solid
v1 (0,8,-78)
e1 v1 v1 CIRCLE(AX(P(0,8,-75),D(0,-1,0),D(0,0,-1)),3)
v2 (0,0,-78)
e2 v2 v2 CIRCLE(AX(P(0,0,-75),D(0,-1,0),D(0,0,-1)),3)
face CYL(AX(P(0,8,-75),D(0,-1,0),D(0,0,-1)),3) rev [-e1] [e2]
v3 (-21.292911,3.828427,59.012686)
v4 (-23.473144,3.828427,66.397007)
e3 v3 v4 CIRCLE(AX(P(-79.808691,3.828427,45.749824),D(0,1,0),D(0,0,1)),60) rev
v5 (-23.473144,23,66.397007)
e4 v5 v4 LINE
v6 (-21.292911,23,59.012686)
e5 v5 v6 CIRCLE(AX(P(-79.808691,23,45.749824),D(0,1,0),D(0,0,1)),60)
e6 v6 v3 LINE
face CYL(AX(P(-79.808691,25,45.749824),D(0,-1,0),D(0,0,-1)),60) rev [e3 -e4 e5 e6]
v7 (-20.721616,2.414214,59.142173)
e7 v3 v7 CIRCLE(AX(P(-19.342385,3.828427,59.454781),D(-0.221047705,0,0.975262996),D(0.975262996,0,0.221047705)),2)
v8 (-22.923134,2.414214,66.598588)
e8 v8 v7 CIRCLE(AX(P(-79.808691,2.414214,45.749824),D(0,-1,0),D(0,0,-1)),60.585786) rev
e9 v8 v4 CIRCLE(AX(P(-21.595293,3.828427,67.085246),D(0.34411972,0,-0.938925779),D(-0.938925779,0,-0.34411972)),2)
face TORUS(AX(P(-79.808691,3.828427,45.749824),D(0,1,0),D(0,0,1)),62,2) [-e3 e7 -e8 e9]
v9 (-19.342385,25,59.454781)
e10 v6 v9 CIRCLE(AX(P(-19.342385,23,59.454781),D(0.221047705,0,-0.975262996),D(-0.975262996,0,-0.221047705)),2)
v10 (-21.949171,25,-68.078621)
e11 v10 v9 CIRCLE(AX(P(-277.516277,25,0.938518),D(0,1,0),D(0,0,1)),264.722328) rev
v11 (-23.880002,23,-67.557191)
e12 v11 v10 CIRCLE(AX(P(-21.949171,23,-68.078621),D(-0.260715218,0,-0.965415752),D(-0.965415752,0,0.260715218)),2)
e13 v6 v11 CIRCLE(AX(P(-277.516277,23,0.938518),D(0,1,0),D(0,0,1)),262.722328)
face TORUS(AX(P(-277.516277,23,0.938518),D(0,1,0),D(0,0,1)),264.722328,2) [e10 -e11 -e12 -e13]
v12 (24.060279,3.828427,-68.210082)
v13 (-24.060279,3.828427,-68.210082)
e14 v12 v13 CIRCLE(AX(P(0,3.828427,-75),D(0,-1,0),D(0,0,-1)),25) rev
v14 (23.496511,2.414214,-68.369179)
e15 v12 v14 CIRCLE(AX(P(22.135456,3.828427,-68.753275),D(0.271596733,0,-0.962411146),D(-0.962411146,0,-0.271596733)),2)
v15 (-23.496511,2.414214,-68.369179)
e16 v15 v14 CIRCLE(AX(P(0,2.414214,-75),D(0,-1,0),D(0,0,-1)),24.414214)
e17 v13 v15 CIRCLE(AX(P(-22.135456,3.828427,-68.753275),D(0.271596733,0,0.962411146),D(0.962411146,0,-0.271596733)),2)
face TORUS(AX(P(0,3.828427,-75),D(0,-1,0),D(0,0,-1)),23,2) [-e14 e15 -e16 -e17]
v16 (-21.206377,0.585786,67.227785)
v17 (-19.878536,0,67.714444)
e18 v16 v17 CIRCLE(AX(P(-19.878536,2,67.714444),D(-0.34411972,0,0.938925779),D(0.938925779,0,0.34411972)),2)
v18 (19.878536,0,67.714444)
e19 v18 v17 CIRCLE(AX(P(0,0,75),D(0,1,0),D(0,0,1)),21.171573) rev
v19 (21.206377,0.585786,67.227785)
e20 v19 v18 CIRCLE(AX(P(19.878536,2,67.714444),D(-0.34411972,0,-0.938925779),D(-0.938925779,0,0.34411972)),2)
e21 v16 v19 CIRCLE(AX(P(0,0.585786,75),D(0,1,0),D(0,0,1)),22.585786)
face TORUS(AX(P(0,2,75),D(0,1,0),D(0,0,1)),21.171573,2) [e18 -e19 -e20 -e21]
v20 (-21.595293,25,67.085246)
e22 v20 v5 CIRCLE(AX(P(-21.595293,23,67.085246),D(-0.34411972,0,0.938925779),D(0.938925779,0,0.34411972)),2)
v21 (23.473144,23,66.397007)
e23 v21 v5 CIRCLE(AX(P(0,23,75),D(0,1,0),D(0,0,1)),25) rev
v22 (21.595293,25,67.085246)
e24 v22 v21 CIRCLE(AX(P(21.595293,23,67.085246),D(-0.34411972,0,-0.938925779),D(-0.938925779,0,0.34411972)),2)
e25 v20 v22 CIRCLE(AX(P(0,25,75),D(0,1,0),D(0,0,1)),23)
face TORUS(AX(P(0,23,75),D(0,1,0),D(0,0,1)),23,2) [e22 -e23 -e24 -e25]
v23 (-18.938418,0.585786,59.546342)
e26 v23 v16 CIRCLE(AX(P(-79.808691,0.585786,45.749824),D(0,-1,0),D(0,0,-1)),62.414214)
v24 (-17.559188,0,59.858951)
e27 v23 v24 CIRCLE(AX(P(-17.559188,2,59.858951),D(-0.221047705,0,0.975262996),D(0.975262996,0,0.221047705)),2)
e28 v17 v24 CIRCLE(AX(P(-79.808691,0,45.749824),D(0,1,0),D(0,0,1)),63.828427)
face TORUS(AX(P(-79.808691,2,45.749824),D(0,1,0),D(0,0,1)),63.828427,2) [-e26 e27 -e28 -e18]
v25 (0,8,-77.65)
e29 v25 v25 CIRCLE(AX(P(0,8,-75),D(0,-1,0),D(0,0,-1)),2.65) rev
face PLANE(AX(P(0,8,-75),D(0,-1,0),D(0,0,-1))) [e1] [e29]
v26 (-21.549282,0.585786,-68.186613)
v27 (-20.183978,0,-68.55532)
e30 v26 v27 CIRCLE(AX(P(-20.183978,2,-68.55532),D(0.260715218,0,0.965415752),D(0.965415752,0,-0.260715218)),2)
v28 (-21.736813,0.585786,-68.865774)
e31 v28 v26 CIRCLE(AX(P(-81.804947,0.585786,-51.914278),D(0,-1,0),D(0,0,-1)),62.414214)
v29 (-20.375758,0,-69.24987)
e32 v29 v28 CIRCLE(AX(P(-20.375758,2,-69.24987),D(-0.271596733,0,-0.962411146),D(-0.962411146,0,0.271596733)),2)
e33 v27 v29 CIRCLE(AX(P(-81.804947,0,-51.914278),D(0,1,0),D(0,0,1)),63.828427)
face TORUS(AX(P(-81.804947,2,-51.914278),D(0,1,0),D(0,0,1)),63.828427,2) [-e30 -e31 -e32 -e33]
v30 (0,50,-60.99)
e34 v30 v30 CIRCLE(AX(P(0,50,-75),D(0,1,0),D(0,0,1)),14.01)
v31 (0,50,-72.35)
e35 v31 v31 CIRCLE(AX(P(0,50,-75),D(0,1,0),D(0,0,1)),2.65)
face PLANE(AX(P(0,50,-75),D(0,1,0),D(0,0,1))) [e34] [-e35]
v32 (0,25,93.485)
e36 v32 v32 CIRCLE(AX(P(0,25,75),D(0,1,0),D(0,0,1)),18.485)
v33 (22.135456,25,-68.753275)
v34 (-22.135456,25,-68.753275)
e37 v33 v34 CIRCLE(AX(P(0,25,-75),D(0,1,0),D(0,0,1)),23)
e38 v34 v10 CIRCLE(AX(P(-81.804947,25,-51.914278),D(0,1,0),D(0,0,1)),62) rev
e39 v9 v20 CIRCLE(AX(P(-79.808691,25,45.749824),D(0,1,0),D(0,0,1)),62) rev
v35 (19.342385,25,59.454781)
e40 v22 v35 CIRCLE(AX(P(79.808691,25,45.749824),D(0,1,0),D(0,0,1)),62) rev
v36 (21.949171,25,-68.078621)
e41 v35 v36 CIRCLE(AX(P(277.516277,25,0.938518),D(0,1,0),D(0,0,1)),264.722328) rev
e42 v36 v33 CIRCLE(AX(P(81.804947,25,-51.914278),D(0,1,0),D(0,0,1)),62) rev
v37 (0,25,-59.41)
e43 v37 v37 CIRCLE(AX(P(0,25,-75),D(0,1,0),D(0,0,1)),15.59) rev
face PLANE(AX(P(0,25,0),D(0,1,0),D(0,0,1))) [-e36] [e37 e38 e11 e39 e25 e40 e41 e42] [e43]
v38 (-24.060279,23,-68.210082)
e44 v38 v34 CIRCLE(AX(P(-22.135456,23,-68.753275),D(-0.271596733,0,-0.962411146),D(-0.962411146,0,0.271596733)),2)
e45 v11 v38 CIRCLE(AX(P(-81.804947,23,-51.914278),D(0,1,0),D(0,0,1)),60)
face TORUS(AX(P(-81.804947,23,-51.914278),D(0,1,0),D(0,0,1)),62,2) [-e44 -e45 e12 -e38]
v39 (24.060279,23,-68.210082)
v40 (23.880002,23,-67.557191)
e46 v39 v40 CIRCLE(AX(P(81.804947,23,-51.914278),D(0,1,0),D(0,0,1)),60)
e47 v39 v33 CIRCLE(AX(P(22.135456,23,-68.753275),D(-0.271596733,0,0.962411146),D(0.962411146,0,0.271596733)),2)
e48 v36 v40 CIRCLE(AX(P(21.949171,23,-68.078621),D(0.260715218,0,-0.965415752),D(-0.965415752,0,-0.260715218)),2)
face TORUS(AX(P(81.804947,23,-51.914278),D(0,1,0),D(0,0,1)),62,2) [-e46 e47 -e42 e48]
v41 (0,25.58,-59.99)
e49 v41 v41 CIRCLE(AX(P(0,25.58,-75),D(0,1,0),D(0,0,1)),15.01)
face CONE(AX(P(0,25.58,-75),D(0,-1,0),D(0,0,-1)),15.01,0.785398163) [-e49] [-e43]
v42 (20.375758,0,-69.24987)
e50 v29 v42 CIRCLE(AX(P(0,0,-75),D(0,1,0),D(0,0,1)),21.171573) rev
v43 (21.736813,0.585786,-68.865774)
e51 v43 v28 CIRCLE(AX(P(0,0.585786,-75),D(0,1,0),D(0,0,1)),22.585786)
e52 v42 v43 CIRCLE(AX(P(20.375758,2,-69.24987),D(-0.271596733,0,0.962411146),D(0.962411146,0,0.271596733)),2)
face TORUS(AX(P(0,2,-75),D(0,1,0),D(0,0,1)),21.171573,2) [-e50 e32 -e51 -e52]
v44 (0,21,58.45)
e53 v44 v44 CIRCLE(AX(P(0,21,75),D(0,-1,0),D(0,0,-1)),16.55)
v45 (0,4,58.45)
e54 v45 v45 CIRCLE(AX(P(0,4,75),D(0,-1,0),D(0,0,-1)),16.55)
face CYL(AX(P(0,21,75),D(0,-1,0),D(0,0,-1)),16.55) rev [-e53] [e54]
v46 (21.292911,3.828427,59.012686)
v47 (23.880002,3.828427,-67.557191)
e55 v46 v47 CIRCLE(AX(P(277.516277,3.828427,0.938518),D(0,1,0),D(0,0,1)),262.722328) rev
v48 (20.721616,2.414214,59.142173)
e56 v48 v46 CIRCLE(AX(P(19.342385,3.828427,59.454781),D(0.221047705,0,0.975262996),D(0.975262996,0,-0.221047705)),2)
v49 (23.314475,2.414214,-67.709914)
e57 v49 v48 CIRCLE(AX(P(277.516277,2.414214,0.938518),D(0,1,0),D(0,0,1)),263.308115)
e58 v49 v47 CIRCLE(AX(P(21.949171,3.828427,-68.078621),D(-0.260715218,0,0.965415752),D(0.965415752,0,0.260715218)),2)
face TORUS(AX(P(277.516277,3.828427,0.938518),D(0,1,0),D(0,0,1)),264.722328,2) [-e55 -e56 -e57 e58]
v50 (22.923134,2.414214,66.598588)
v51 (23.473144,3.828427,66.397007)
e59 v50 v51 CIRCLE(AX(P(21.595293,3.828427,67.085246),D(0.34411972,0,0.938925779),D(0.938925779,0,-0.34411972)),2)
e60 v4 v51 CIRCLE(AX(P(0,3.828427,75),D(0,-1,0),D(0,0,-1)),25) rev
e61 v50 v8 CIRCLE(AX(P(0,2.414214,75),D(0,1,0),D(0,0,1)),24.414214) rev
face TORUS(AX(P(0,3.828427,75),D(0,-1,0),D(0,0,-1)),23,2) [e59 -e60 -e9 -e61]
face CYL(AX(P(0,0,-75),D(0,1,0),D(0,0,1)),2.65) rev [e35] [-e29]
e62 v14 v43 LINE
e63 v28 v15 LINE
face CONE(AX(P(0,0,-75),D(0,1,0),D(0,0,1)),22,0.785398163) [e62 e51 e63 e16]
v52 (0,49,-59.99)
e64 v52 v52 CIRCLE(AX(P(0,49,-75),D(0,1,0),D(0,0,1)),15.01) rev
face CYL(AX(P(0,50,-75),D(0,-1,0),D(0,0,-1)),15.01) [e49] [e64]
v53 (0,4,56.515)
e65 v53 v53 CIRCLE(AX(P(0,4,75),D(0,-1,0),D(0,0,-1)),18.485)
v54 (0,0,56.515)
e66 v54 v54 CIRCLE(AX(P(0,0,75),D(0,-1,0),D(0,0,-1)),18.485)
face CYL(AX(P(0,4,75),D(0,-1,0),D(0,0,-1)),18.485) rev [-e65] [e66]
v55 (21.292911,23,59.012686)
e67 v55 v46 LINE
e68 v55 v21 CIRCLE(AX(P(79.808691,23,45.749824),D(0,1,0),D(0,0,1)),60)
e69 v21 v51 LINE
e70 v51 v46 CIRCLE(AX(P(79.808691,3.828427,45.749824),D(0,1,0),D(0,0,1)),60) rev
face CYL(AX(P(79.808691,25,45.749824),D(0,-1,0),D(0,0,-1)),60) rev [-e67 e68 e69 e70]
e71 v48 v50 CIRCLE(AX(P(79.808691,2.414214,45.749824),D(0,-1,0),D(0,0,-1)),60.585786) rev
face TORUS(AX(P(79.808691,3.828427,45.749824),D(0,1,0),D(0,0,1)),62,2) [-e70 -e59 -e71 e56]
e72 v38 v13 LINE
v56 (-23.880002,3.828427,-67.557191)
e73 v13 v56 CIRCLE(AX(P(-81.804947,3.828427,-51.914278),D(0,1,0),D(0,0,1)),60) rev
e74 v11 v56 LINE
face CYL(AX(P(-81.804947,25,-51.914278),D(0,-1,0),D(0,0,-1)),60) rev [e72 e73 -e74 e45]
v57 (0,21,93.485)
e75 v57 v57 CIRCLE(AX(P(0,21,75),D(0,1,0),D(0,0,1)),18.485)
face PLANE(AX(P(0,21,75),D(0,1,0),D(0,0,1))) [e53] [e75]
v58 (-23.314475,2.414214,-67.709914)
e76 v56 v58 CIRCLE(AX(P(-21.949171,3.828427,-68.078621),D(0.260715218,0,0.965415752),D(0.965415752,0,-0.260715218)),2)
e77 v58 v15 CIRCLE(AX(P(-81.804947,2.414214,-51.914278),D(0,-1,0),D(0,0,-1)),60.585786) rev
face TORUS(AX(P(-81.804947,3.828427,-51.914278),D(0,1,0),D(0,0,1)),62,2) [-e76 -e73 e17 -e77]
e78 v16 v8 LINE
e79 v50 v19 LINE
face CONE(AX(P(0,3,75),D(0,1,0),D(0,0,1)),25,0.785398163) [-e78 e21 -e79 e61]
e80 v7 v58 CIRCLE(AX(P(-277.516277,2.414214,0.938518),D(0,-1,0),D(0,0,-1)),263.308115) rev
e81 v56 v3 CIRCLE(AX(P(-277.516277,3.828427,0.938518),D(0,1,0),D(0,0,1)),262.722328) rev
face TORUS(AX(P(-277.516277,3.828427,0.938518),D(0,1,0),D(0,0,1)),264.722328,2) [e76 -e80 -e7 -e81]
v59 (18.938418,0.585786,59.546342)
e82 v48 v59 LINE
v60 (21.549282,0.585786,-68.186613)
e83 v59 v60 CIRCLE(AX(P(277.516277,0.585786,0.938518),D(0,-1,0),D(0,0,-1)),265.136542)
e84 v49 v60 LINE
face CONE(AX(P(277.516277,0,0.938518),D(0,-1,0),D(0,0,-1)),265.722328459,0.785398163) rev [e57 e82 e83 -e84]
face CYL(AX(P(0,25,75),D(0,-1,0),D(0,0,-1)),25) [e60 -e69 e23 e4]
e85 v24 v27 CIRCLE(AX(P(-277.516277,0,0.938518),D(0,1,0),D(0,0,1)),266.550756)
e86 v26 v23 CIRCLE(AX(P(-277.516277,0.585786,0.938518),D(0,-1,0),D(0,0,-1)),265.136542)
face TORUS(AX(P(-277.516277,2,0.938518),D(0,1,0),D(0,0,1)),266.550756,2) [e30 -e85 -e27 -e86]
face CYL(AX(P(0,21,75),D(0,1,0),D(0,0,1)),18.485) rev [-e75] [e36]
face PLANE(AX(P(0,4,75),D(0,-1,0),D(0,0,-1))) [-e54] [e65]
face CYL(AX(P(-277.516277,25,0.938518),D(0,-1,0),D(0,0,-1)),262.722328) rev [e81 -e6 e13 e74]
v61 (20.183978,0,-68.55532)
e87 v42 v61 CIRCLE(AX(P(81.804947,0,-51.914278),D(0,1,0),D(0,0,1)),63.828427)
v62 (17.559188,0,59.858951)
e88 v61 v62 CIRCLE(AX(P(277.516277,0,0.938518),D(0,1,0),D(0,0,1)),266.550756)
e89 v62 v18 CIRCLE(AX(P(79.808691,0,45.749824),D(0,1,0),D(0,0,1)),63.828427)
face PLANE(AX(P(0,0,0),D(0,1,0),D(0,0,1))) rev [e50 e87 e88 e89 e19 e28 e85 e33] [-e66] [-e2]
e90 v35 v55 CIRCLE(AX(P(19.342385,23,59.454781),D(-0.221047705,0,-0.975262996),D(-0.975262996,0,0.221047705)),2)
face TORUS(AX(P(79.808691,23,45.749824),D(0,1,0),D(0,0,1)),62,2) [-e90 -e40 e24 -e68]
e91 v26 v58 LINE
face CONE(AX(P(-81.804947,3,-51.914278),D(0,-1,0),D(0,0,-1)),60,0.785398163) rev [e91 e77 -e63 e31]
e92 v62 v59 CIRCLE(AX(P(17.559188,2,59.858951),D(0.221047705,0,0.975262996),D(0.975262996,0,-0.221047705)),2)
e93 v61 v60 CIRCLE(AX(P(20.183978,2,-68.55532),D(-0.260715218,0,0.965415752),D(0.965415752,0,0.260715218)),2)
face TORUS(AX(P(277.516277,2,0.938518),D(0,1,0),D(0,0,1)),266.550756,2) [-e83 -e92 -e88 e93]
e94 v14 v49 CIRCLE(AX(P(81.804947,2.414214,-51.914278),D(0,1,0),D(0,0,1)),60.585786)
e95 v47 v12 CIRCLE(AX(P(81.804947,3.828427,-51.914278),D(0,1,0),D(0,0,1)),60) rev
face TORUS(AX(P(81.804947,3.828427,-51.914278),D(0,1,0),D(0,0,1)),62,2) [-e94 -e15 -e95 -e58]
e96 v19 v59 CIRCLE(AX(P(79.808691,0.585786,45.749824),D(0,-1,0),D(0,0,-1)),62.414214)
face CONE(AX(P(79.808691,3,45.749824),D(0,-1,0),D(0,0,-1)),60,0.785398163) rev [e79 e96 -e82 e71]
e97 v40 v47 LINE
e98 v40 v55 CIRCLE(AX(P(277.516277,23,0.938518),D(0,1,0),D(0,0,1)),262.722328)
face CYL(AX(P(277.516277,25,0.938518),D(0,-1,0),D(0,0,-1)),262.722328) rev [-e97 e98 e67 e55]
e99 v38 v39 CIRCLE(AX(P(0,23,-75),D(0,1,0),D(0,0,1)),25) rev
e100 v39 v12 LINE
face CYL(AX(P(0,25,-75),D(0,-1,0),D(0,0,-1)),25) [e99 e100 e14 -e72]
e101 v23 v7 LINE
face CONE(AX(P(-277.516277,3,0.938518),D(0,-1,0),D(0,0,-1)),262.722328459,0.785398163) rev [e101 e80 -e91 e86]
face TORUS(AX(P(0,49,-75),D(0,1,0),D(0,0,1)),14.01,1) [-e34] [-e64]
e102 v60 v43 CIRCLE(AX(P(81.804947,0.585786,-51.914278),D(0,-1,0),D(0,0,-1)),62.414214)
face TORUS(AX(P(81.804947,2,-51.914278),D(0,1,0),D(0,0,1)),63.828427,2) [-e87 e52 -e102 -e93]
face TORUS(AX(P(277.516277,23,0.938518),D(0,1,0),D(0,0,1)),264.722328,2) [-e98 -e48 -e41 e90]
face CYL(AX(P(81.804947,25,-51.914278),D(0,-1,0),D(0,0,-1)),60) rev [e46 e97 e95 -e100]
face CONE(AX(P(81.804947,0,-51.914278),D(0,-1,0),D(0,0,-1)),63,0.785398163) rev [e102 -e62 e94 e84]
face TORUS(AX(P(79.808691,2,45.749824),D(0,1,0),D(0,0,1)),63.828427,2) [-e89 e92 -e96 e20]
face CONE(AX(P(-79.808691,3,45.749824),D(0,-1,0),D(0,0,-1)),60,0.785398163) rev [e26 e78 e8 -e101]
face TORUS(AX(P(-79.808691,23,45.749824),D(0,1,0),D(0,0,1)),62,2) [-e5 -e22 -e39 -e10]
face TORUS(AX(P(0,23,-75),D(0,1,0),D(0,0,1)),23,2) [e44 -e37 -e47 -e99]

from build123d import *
from OCP.BRepAlgoAPI import BRepAlgoAPI_Cut
from OCP.TopTools import TopTools_ListOfShape

# Parameters (mm, degrees)
BOSS_EXTRUDE1_DEPTH = 25
FILLET1_R           = 2
CHAMFER1_SIZE       = 3
FILLET2_ANGLE       = 0.646799
FILLET2_2_ANGLE     = 211.518608
FILLET2_3_ANGLE     = 27.883082
FILLET2_4_ANGLE     = 0.646799
FILLET2_5_ANGLE     = 7.357492
FILLET2_6_ANGLE     = 27.883082
FILLET2_7_ANGLE     = 220.256139
FILLET2_8_ANGLE     = 7.357492
FILLET2_9_ANGLE     = 211.518608
FILLET2_10_ANGLE    = 220.256139
SKETCH2_R           = 18.485
CUT_EXTRUDE1_DEPTH  = 4
CUT_EXTRUDE2_START  = -4
SKETCH3_R           = 18.485
CUT_EXTRUDE2_DEPTH  = 4
SKETCH4_R           = 16.55
CUT_EXTRUDE3_DEPTH  = 17
SKETCH5_R           = 15.01
BOSS_EXTRUDE2_DEPTH = 25
SKETCH6_R           = 2.65
CUT_EXTRUDE4_DEPTH  = 50
SKETCH7_R           = 3
CUT_EXTRUDE5_DEPTH  = 8


with BuildPart() as part:
    # Sketch1 → Boss-Extrude1 (new body)
    with BuildSketch(Plane(origin=(0, 0, 0), x_dir=(1, 0, 0), z_dir=(0, 1, 0))):
        with BuildLine():
            ThreePointArc((-24.060278657, 68.210081667), (-23.969219176, 67.883890597), (-23.880002285, 67.55719075))
            ThreePointArc((-23.880002285, 67.55719075), (-14.848813015, 4.430409951), (-21.292911408, -59.012686046))
            ThreePointArc((-21.292911408, -59.012686046), (-22.264457345, -62.739854684), (-23.47314447, -66.397006991))
            ThreePointArc((-23.47314447, -66.397006991), (0, -100), (23.47314447, -66.397006991))
            ThreePointArc((23.47314447, -66.397006991), (22.264457345, -62.739854684), (21.292911408, -59.012686046))
            ThreePointArc((21.292911408, -59.012686046), (14.848813015, 4.430409951), (23.880002285, 67.55719075))
            ThreePointArc((23.880002285, 67.55719075), (23.969219176, 67.883890597), (24.060278657, 68.210081667))
            ThreePointArc((24.060278657, 68.210081667), (0, 100), (-24.060278657, 68.210081667))
        make_face()
    extrude(amount=BOSS_EXTRUDE1_DEPTH)

    # Fillet1
    fillet1_edges = [part.edges().sort_by_distance(p)[0] for p in [
        (0, 25, 100),
        (22.264457345, 25, 62.739854684),
        (14.848813015, 25, -4.430409951),
        (23.969219176, 25, -67.883890597),
        (0, 25, -100),
        (-23.969219176, 25, -67.883890597),
        (-14.848813015, 25, -4.430409951),
        (-22.264457345, 25, 62.739854684),
    ]]
    fillet(fillet1_edges, radius=FILLET1_R)

    # Chamfer1
    chamfer1_edges = [part.edges().sort_by_distance(p)[0] for p in [
        (-14.848813015, 0, -4.430409951),
        (-23.969219176, 0, -67.883890597),
        (0, 0, -100),
        (23.969219176, 0, -67.883890597),
        (14.848813015, 0, -4.430409951),
        (22.264457345, 0, 62.739854684),
        (0, 0, 100),
        (-22.264457345, 0, 62.739854684),
    ]]
    chamfer(chamfer1_edges, length=CHAMFER1_SIZE)


with BuildPart() as fillet2_tool:
    # Fillet2: read off the stored shape, not the designer's step
    # Fillet2 outline → Fillet2 (revolve)
    with BuildSketch(Plane(origin=(81.804947433, 0, -51.914277669), x_dir=(-0.9624111462665474, 0, -0.2715967333049319), z_dir=(0.2715967333049319, 0, -0.9624111462665474))):
        with BuildLine():
            ThreePointArc((60.585786438, 2.414213562), (60.152240935, 3.06306026), (60, 3.828427125))
            Line((60, 3.828427125), (60, 2.414213562))
            Line((60, 2.414213562), (60.585786438, 2.414213562))
        make_face()
        with BuildLine():
            ThreePointArc((63.828427125, 0), (63.06306026, 0.152240935), (62.414213562, 0.585786438))
            Line((62.414213562, 0.585786438), (62.414213562, 0))
            Line((62.414213562, 0), (63.828427125, 0))
        make_face()
    revolve(axis=Axis((81.804947433, 0, -51.914277669), (0, 1, 0)), revolution_arc=FILLET2_ANGLE)


with BuildPart() as part_1:
    add(part.part)

    # Fillet2: cut by fillet2_tool, with a tolerance
    fillet2_stock = TopTools_ListOfShape()
    fillet2_stock.Append(part_1.part.wrapped)
    fillet2_tools = TopTools_ListOfShape()
    fillet2_tools.Append(fillet2_tool.part.wrapped)
    fillet2_cut = BRepAlgoAPI_Cut()
    fillet2_cut.SetArguments(fillet2_stock)
    fillet2_cut.SetTools(fillet2_tools)
    fillet2_cut.SetFuzzyValue(0.00001)
    fillet2_cut.Build()
    add(Compound.cast(fillet2_cut.Shape()).solids(), mode=Mode.REPLACE)


with BuildPart() as fillet2_2_tool:
    # Fillet2 2 outline → Fillet2 2 (revolve)
    with BuildSketch(Plane(origin=(0, 0, -75), x_dir=(0.9624111462665468, 0, 0.2715967333049339), z_dir=(-0.2715967333049339, 0, 0.9624111462665468))):
        with BuildLine():
            Line((25, 2.414213562), (25, 3.828427125))
            ThreePointArc((25, 3.828427125), (24.847759065, 3.06306026), (24.414213562, 2.414213562))
            Line((24.414213562, 2.414213562), (25, 2.414213562))
        make_face()
    revolve(axis=Axis((0, 0, -75), (0, 1, 0)), revolution_arc=FILLET2_2_ANGLE)


with BuildPart() as part_2:
    add(part_1.part)

    # Fillet2 2: cut by fillet2_2_tool, with a tolerance
    fillet2_2_stock = TopTools_ListOfShape()
    fillet2_2_stock.Append(part_2.part.wrapped)
    fillet2_2_tools = TopTools_ListOfShape()
    fillet2_2_tools.Append(fillet2_2_tool.part.wrapped)
    fillet2_2_cut = BRepAlgoAPI_Cut()
    fillet2_2_cut.SetArguments(fillet2_2_stock)
    fillet2_2_cut.SetTools(fillet2_2_tools)
    fillet2_2_cut.SetFuzzyValue(0.00001)
    fillet2_2_cut.Build()
    add(Compound.cast(fillet2_2_cut.Shape()).solids(), mode=Mode.REPLACE)


with BuildPart() as fillet2_3_tool:
    # Fillet2 3 outline → Fillet2 3 (revolve)
    with BuildSketch(Plane(origin=(277.516276702, 0, 0.938518393), x_dir=(-0.965415752456716, 0, -0.2607152180223337), z_dir=(0.2607152180223337, 0, -0.965415752456716))):
        with BuildLine():
            ThreePointArc((263.308114897, 2.414213562), (262.874569394, 3.06306026), (262.722328459, 3.828427125))
            Line((262.722328459, 3.828427125), (262.722328459, 2.414213562))
            Line((262.722328459, 2.414213562), (263.308114897, 2.414213562))
        make_face()
        with BuildLine():
            ThreePointArc((266.550755584, 0), (265.785388719, 0.152240935), (265.136542022, 0.585786438))
            Line((265.136542022, 0.585786438), (265.136542022, 0))
            Line((265.136542022, 0), (266.550755584, 0))
        make_face()
    revolve(axis=Axis((277.516276702, 0, 0.938518393), (0, 1, 0)), revolution_arc=FILLET2_3_ANGLE)


with BuildPart() as part_3:
    add(part_2.part)

    # Fillet2 3: cut by fillet2_3_tool, with a tolerance
    fillet2_3_stock = TopTools_ListOfShape()
    fillet2_3_stock.Append(part_3.part.wrapped)
    fillet2_3_tools = TopTools_ListOfShape()
    fillet2_3_tools.Append(fillet2_3_tool.part.wrapped)
    fillet2_3_cut = BRepAlgoAPI_Cut()
    fillet2_3_cut.SetArguments(fillet2_3_stock)
    fillet2_3_cut.SetTools(fillet2_3_tools)
    fillet2_3_cut.SetFuzzyValue(0.00001)
    fillet2_3_cut.Build()
    add(Compound.cast(fillet2_3_cut.Shape()).solids(), mode=Mode.REPLACE)


with BuildPart() as fillet2_4_tool:
    # Fillet2 4 outline → Fillet2 4 (revolve)
    with BuildSketch(Plane(origin=(-81.804947433, 0, -51.914277669), x_dir=(0.9654157524567423, 0, -0.260715218022236), z_dir=(0.260715218022236, 0, 0.9654157524567423))):
        with BuildLine():
            ThreePointArc((60.585786438, 2.414213562), (60.152240935, 3.06306026), (60, 3.828427125))
            Line((60, 3.828427125), (60, 2.414213562))
            Line((60, 2.414213562), (60.585786438, 2.414213562))
        make_face()
        with BuildLine():
            ThreePointArc((63.828427125, 0), (63.06306026, 0.152240935), (62.414213562, 0.585786438))
            Line((62.414213562, 0.585786438), (62.414213562, 0))
            Line((62.414213562, 0), (63.828427125, 0))
        make_face()
    revolve(axis=Axis((-81.804947433, 0, -51.914277669), (0, 1, 0)), revolution_arc=FILLET2_4_ANGLE)


with BuildPart() as part_4:
    add(part_3.part)

    # Fillet2 4: cut by fillet2_4_tool, with a tolerance
    fillet2_4_stock = TopTools_ListOfShape()
    fillet2_4_stock.Append(part_4.part.wrapped)
    fillet2_4_tools = TopTools_ListOfShape()
    fillet2_4_tools.Append(fillet2_4_tool.part.wrapped)
    fillet2_4_cut = BRepAlgoAPI_Cut()
    fillet2_4_cut.SetArguments(fillet2_4_stock)
    fillet2_4_cut.SetTools(fillet2_4_tools)
    fillet2_4_cut.SetFuzzyValue(0.00001)
    fillet2_4_cut.Build()
    add(Compound.cast(fillet2_4_cut.Shape()).solids(), mode=Mode.REPLACE)


with BuildPart() as fillet2_5_tool:
    # Fillet2 5 outline → Fillet2 5 (revolve)
    with BuildSketch(Plane(origin=(79.808691197, 0, 45.74982377), x_dir=(-0.9752629964743126, 0, 0.22104770459777442), z_dir=(-0.22104770459777442, 0, -0.9752629964743126))):
        with BuildLine():
            ThreePointArc((60.585786438, 2.414213562), (60.152240935, 3.06306026), (60, 3.828427125))
            Line((60, 3.828427125), (60, 2.414213562))
            Line((60, 2.414213562), (60.585786438, 2.414213562))
        make_face()
        with BuildLine():
            ThreePointArc((63.828427125, 0), (63.06306026, 0.152240935), (62.414213562, 0.585786438))
            Line((62.414213562, 0.585786438), (62.414213562, 0))
            Line((62.414213562, 0), (63.828427125, 0))
        make_face()
    revolve(axis=Axis((79.808691197, 0, 45.74982377), (0, 1, 0)), revolution_arc=FILLET2_5_ANGLE)


with BuildPart() as part_5:
    add(part_4.part)

    # Fillet2 5: cut by fillet2_5_tool, with a tolerance
    fillet2_5_stock = TopTools_ListOfShape()
    fillet2_5_stock.Append(part_5.part.wrapped)
    fillet2_5_tools = TopTools_ListOfShape()
    fillet2_5_tools.Append(fillet2_5_tool.part.wrapped)
    fillet2_5_cut = BRepAlgoAPI_Cut()
    fillet2_5_cut.SetArguments(fillet2_5_stock)
    fillet2_5_cut.SetTools(fillet2_5_tools)
    fillet2_5_cut.SetFuzzyValue(0.00001)
    fillet2_5_cut.Build()
    add(Compound.cast(fillet2_5_cut.Shape()).solids(), mode=Mode.REPLACE)


with BuildPart() as fillet2_6_tool:
    # Fillet2 6 outline → Fillet2 6 (revolve)
    with BuildSketch(Plane(origin=(-277.516276702, 0, 0.938518393), x_dir=(0.975262996474313, 0, 0.22104770459777243), z_dir=(-0.22104770459777243, 0, 0.975262996474313))):
        with BuildLine():
            ThreePointArc((263.308114897, 2.414213562), (262.874569394, 3.06306026), (262.722328459, 3.828427125))
            Line((262.722328459, 3.828427125), (262.722328459, 2.414213562))
            Line((262.722328459, 2.414213562), (263.308114897, 2.414213562))
        make_face()
        with BuildLine():
            ThreePointArc((266.550755584, 0), (265.785388719, 0.152240935), (265.136542022, 0.585786438))
            Line((265.136542022, 0.585786438), (265.136542022, 0))
            Line((265.136542022, 0), (266.550755584, 0))
        make_face()
    revolve(axis=Axis((-277.516276702, 0, 0.938518393), (0, 1, 0)), revolution_arc=FILLET2_6_ANGLE)


with BuildPart() as part_6:
    add(part_5.part)

    # Fillet2 6: cut by fillet2_6_tool, with a tolerance
    fillet2_6_stock = TopTools_ListOfShape()
    fillet2_6_stock.Append(part_6.part.wrapped)
    fillet2_6_tools = TopTools_ListOfShape()
    fillet2_6_tools.Append(fillet2_6_tool.part.wrapped)
    fillet2_6_cut = BRepAlgoAPI_Cut()
    fillet2_6_cut.SetArguments(fillet2_6_stock)
    fillet2_6_cut.SetTools(fillet2_6_tools)
    fillet2_6_cut.SetFuzzyValue(0.00001)
    fillet2_6_cut.Build()
    add(Compound.cast(fillet2_6_cut.Shape()).solids(), mode=Mode.REPLACE)


with BuildPart() as fillet2_7_tool:
    # Fillet2 7 outline → Fillet2 7 (revolve)
    with BuildSketch(Plane(origin=(0, 0, 75), x_dir=(-0.9389257787826242, 0, -0.34411972035534766), z_dir=(0.34411972035534766, 0, -0.9389257787826242))):
        with BuildLine():
            Line((25, 2.414213562), (25, 3.828427125))
            ThreePointArc((25, 3.828427125), (24.847759065, 3.06306026), (24.414213562, 2.414213562))
            Line((24.414213562, 2.414213562), (25, 2.414213562))
        make_face()
    revolve(axis=Axis((0, 0, 75), (0, 1, 0)), revolution_arc=FILLET2_7_ANGLE)


with BuildPart() as part_7:
    add(part_6.part)

    # Fillet2 7: cut by fillet2_7_tool, with a tolerance
    fillet2_7_stock = TopTools_ListOfShape()
    fillet2_7_stock.Append(part_7.part.wrapped)
    fillet2_7_tools = TopTools_ListOfShape()
    fillet2_7_tools.Append(fillet2_7_tool.part.wrapped)
    fillet2_7_cut = BRepAlgoAPI_Cut()
    fillet2_7_cut.SetArguments(fillet2_7_stock)
    fillet2_7_cut.SetTools(fillet2_7_tools)
    fillet2_7_cut.SetFuzzyValue(0.00001)
    fillet2_7_cut.Build()
    add(Compound.cast(fillet2_7_cut.Shape()).solids(), mode=Mode.REPLACE)


with BuildPart() as fillet2_8_tool:
    # Fillet2 8 outline → Fillet2 8 (revolve)
    with BuildSketch(Plane(origin=(-79.808691197, 0, 45.74982377), x_dir=(0.9389257787826252, 0, 0.344119720355345), z_dir=(-0.344119720355345, 0, 0.9389257787826252))):
        with BuildLine():
            ThreePointArc((60.585786438, 2.414213562), (60.152240935, 3.06306026), (60, 3.828427125))
            Line((60, 3.828427125), (60, 2.414213562))
            Line((60, 2.414213562), (60.585786438, 2.414213562))
        make_face()
        with BuildLine():
            ThreePointArc((63.828427125, 0), (63.06306026, 0.152240935), (62.414213562, 0.585786438))
            Line((62.414213562, 0.585786438), (62.414213562, 0))
            Line((62.414213562, 0), (63.828427125, 0))
        make_face()
    revolve(axis=Axis((-79.808691197, 0, 45.74982377), (0, 1, 0)), revolution_arc=FILLET2_8_ANGLE)


with BuildPart() as part_8:
    add(part_7.part)

    # Fillet2 8: cut by fillet2_8_tool, with a tolerance
    fillet2_8_stock = TopTools_ListOfShape()
    fillet2_8_stock.Append(part_8.part.wrapped)
    fillet2_8_tools = TopTools_ListOfShape()
    fillet2_8_tools.Append(fillet2_8_tool.part.wrapped)
    fillet2_8_cut = BRepAlgoAPI_Cut()
    fillet2_8_cut.SetArguments(fillet2_8_stock)
    fillet2_8_cut.SetTools(fillet2_8_tools)
    fillet2_8_cut.SetFuzzyValue(0.00001)
    fillet2_8_cut.Build()
    add(Compound.cast(fillet2_8_cut.Shape()).solids(), mode=Mode.REPLACE)


with BuildPart() as fillet2_9_tool:
    # Fillet2 9 outline → Fillet2 9 (revolve)
    with BuildSketch(Plane(origin=(0, 0, -75), x_dir=(0.9624111462665468, 0, 0.2715967333049339), z_dir=(-0.2715967333049339, 0, 0.9624111462665468))):
        with BuildLine():
            ThreePointArc((22.585786438, 0.585786438), (21.93693974, 0.152240935), (21.171572875, 0))
            Line((21.171572875, 0), (22.585786438, 0))
            Line((22.585786438, 0), (22.585786438, 0.585786438))
        make_face()
    revolve(axis=Axis((0, 0, -75), (0, 1, 0)), revolution_arc=FILLET2_9_ANGLE)


with BuildPart() as part_9:
    add(part_8.part)

    # Fillet2 9: cut by fillet2_9_tool, with a tolerance
    fillet2_9_stock = TopTools_ListOfShape()
    fillet2_9_stock.Append(part_9.part.wrapped)
    fillet2_9_tools = TopTools_ListOfShape()
    fillet2_9_tools.Append(fillet2_9_tool.part.wrapped)
    fillet2_9_cut = BRepAlgoAPI_Cut()
    fillet2_9_cut.SetArguments(fillet2_9_stock)
    fillet2_9_cut.SetTools(fillet2_9_tools)
    fillet2_9_cut.SetFuzzyValue(0.00001)
    fillet2_9_cut.Build()
    add(Compound.cast(fillet2_9_cut.Shape()).solids(), mode=Mode.REPLACE)


with BuildPart() as fillet2_10_tool:
    # Fillet2 10 outline → Fillet2 10 (revolve)
    with BuildSketch(Plane(origin=(0, 0, 75), x_dir=(-0.9389257787826242, 0, -0.34411972035534766), z_dir=(0.34411972035534766, 0, -0.9389257787826242))):
        with BuildLine():
            ThreePointArc((22.585786438, 0.585786438), (21.93693974, 0.152240935), (21.171572875, 0))
            Line((21.171572875, 0), (22.585786438, 0))
            Line((22.585786438, 0), (22.585786438, 0.585786438))
        make_face()
    revolve(axis=Axis((0, 0, 75), (0, 1, 0)), revolution_arc=FILLET2_10_ANGLE)


with BuildPart() as part_10:
    add(part_9.part)

    # Fillet2 10: cut by fillet2_10_tool, with a tolerance
    fillet2_10_stock = TopTools_ListOfShape()
    fillet2_10_stock.Append(part_10.part.wrapped)
    fillet2_10_tools = TopTools_ListOfShape()
    fillet2_10_tools.Append(fillet2_10_tool.part.wrapped)
    fillet2_10_cut = BRepAlgoAPI_Cut()
    fillet2_10_cut.SetArguments(fillet2_10_stock)
    fillet2_10_cut.SetTools(fillet2_10_tools)
    fillet2_10_cut.SetFuzzyValue(0.00001)
    fillet2_10_cut.Build()
    add(Compound.cast(fillet2_10_cut.Shape()).solids(), mode=Mode.REPLACE)

    # Sketch2 → Cut-Extrude1 (cut)
    with BuildSketch(Plane(origin=(0, 25, 0), x_dir=(1, 0, 0), z_dir=(0, 1, 0))):
        with Locations(Location((0, -75, 0), (0, 0, 270))):
            Circle(SKETCH2_R)
    extrude(amount=-CUT_EXTRUDE1_DEPTH, mode=Mode.SUBTRACT)

    # Sketch3 → Cut-Extrude2 (cut)
    with BuildSketch(Plane.XZ.offset(CUT_EXTRUDE2_START)):
        with Locations(Location((0, 75, 0), (0, 0, 90))):
            Circle(SKETCH3_R)
    extrude(amount=CUT_EXTRUDE2_DEPTH, mode=Mode.SUBTRACT)

    # Sketch4 → Cut-Extrude3 (cut)
    with BuildSketch(Plane.XZ.offset(-4)):
        with Locations(Location((0, 75, 0), (0, 0, 270))):
            Circle(SKETCH4_R)
    extrude(amount=-CUT_EXTRUDE3_DEPTH, mode=Mode.SUBTRACT)

    # Sketch5 → Boss-Extrude2 (add)
    with BuildSketch(Plane(origin=(0, 25, 0), x_dir=(1, 0, 0), z_dir=(0, 1, 0))):
        with Locations(Location((0, 75, 0), (0, 0, 270))):
            Circle(SKETCH5_R)
    extrude(amount=BOSS_EXTRUDE2_DEPTH)

    # Chamfer2: read off the stored shape, not the designer's step
    # Chamfer2 outline → Chamfer2 (revolve)
    with BuildSketch(Plane.XY.offset(-75)):
        Polygon((15.59, 25), (15.01, 25.58), (15.01, 25), align=None)
    revolve(axis=Axis((0, 0, -75), (0, 1, 0)))

    # Sketch6 → Cut-Extrude4 (cut)
    with BuildSketch(Plane(origin=(0, 50, 0), x_dir=(1, 0, 0), z_dir=(0, 1, 0))):
        with Locations(Location((0, 75, 0), (0, 0, 270))):
            Circle(SKETCH6_R)
    extrude(amount=-CUT_EXTRUDE4_DEPTH, mode=Mode.SUBTRACT)

    # Sketch7 → Cut-Extrude5 (cut)
    with BuildSketch(Plane.XZ):
        with Locations(Location((0, -75, 0), (0, 0, 270))):
            Circle(SKETCH7_R)
    extrude(amount=-CUT_EXTRUDE5_DEPTH, mode=Mode.SUBTRACT)

    # Fillet3: read off the stored shape, not the designer's step
    # Fillet3 outline → Fillet3 (revolve, cut)
    with BuildSketch(Plane.XY.offset(-75)):
        with BuildLine():
            ThreePointArc((14.01, 50), (14.717106781, 49.707106781), (15.01, 49))
            Line((15.01, 49), (15.01, 50))
            Line((15.01, 50), (14.01, 50))
        make_face()
    revolve(axis=Axis((0, 0, -75), (0, 1, 0)), mode=Mode.SUBTRACT)


solid = part_10.part
